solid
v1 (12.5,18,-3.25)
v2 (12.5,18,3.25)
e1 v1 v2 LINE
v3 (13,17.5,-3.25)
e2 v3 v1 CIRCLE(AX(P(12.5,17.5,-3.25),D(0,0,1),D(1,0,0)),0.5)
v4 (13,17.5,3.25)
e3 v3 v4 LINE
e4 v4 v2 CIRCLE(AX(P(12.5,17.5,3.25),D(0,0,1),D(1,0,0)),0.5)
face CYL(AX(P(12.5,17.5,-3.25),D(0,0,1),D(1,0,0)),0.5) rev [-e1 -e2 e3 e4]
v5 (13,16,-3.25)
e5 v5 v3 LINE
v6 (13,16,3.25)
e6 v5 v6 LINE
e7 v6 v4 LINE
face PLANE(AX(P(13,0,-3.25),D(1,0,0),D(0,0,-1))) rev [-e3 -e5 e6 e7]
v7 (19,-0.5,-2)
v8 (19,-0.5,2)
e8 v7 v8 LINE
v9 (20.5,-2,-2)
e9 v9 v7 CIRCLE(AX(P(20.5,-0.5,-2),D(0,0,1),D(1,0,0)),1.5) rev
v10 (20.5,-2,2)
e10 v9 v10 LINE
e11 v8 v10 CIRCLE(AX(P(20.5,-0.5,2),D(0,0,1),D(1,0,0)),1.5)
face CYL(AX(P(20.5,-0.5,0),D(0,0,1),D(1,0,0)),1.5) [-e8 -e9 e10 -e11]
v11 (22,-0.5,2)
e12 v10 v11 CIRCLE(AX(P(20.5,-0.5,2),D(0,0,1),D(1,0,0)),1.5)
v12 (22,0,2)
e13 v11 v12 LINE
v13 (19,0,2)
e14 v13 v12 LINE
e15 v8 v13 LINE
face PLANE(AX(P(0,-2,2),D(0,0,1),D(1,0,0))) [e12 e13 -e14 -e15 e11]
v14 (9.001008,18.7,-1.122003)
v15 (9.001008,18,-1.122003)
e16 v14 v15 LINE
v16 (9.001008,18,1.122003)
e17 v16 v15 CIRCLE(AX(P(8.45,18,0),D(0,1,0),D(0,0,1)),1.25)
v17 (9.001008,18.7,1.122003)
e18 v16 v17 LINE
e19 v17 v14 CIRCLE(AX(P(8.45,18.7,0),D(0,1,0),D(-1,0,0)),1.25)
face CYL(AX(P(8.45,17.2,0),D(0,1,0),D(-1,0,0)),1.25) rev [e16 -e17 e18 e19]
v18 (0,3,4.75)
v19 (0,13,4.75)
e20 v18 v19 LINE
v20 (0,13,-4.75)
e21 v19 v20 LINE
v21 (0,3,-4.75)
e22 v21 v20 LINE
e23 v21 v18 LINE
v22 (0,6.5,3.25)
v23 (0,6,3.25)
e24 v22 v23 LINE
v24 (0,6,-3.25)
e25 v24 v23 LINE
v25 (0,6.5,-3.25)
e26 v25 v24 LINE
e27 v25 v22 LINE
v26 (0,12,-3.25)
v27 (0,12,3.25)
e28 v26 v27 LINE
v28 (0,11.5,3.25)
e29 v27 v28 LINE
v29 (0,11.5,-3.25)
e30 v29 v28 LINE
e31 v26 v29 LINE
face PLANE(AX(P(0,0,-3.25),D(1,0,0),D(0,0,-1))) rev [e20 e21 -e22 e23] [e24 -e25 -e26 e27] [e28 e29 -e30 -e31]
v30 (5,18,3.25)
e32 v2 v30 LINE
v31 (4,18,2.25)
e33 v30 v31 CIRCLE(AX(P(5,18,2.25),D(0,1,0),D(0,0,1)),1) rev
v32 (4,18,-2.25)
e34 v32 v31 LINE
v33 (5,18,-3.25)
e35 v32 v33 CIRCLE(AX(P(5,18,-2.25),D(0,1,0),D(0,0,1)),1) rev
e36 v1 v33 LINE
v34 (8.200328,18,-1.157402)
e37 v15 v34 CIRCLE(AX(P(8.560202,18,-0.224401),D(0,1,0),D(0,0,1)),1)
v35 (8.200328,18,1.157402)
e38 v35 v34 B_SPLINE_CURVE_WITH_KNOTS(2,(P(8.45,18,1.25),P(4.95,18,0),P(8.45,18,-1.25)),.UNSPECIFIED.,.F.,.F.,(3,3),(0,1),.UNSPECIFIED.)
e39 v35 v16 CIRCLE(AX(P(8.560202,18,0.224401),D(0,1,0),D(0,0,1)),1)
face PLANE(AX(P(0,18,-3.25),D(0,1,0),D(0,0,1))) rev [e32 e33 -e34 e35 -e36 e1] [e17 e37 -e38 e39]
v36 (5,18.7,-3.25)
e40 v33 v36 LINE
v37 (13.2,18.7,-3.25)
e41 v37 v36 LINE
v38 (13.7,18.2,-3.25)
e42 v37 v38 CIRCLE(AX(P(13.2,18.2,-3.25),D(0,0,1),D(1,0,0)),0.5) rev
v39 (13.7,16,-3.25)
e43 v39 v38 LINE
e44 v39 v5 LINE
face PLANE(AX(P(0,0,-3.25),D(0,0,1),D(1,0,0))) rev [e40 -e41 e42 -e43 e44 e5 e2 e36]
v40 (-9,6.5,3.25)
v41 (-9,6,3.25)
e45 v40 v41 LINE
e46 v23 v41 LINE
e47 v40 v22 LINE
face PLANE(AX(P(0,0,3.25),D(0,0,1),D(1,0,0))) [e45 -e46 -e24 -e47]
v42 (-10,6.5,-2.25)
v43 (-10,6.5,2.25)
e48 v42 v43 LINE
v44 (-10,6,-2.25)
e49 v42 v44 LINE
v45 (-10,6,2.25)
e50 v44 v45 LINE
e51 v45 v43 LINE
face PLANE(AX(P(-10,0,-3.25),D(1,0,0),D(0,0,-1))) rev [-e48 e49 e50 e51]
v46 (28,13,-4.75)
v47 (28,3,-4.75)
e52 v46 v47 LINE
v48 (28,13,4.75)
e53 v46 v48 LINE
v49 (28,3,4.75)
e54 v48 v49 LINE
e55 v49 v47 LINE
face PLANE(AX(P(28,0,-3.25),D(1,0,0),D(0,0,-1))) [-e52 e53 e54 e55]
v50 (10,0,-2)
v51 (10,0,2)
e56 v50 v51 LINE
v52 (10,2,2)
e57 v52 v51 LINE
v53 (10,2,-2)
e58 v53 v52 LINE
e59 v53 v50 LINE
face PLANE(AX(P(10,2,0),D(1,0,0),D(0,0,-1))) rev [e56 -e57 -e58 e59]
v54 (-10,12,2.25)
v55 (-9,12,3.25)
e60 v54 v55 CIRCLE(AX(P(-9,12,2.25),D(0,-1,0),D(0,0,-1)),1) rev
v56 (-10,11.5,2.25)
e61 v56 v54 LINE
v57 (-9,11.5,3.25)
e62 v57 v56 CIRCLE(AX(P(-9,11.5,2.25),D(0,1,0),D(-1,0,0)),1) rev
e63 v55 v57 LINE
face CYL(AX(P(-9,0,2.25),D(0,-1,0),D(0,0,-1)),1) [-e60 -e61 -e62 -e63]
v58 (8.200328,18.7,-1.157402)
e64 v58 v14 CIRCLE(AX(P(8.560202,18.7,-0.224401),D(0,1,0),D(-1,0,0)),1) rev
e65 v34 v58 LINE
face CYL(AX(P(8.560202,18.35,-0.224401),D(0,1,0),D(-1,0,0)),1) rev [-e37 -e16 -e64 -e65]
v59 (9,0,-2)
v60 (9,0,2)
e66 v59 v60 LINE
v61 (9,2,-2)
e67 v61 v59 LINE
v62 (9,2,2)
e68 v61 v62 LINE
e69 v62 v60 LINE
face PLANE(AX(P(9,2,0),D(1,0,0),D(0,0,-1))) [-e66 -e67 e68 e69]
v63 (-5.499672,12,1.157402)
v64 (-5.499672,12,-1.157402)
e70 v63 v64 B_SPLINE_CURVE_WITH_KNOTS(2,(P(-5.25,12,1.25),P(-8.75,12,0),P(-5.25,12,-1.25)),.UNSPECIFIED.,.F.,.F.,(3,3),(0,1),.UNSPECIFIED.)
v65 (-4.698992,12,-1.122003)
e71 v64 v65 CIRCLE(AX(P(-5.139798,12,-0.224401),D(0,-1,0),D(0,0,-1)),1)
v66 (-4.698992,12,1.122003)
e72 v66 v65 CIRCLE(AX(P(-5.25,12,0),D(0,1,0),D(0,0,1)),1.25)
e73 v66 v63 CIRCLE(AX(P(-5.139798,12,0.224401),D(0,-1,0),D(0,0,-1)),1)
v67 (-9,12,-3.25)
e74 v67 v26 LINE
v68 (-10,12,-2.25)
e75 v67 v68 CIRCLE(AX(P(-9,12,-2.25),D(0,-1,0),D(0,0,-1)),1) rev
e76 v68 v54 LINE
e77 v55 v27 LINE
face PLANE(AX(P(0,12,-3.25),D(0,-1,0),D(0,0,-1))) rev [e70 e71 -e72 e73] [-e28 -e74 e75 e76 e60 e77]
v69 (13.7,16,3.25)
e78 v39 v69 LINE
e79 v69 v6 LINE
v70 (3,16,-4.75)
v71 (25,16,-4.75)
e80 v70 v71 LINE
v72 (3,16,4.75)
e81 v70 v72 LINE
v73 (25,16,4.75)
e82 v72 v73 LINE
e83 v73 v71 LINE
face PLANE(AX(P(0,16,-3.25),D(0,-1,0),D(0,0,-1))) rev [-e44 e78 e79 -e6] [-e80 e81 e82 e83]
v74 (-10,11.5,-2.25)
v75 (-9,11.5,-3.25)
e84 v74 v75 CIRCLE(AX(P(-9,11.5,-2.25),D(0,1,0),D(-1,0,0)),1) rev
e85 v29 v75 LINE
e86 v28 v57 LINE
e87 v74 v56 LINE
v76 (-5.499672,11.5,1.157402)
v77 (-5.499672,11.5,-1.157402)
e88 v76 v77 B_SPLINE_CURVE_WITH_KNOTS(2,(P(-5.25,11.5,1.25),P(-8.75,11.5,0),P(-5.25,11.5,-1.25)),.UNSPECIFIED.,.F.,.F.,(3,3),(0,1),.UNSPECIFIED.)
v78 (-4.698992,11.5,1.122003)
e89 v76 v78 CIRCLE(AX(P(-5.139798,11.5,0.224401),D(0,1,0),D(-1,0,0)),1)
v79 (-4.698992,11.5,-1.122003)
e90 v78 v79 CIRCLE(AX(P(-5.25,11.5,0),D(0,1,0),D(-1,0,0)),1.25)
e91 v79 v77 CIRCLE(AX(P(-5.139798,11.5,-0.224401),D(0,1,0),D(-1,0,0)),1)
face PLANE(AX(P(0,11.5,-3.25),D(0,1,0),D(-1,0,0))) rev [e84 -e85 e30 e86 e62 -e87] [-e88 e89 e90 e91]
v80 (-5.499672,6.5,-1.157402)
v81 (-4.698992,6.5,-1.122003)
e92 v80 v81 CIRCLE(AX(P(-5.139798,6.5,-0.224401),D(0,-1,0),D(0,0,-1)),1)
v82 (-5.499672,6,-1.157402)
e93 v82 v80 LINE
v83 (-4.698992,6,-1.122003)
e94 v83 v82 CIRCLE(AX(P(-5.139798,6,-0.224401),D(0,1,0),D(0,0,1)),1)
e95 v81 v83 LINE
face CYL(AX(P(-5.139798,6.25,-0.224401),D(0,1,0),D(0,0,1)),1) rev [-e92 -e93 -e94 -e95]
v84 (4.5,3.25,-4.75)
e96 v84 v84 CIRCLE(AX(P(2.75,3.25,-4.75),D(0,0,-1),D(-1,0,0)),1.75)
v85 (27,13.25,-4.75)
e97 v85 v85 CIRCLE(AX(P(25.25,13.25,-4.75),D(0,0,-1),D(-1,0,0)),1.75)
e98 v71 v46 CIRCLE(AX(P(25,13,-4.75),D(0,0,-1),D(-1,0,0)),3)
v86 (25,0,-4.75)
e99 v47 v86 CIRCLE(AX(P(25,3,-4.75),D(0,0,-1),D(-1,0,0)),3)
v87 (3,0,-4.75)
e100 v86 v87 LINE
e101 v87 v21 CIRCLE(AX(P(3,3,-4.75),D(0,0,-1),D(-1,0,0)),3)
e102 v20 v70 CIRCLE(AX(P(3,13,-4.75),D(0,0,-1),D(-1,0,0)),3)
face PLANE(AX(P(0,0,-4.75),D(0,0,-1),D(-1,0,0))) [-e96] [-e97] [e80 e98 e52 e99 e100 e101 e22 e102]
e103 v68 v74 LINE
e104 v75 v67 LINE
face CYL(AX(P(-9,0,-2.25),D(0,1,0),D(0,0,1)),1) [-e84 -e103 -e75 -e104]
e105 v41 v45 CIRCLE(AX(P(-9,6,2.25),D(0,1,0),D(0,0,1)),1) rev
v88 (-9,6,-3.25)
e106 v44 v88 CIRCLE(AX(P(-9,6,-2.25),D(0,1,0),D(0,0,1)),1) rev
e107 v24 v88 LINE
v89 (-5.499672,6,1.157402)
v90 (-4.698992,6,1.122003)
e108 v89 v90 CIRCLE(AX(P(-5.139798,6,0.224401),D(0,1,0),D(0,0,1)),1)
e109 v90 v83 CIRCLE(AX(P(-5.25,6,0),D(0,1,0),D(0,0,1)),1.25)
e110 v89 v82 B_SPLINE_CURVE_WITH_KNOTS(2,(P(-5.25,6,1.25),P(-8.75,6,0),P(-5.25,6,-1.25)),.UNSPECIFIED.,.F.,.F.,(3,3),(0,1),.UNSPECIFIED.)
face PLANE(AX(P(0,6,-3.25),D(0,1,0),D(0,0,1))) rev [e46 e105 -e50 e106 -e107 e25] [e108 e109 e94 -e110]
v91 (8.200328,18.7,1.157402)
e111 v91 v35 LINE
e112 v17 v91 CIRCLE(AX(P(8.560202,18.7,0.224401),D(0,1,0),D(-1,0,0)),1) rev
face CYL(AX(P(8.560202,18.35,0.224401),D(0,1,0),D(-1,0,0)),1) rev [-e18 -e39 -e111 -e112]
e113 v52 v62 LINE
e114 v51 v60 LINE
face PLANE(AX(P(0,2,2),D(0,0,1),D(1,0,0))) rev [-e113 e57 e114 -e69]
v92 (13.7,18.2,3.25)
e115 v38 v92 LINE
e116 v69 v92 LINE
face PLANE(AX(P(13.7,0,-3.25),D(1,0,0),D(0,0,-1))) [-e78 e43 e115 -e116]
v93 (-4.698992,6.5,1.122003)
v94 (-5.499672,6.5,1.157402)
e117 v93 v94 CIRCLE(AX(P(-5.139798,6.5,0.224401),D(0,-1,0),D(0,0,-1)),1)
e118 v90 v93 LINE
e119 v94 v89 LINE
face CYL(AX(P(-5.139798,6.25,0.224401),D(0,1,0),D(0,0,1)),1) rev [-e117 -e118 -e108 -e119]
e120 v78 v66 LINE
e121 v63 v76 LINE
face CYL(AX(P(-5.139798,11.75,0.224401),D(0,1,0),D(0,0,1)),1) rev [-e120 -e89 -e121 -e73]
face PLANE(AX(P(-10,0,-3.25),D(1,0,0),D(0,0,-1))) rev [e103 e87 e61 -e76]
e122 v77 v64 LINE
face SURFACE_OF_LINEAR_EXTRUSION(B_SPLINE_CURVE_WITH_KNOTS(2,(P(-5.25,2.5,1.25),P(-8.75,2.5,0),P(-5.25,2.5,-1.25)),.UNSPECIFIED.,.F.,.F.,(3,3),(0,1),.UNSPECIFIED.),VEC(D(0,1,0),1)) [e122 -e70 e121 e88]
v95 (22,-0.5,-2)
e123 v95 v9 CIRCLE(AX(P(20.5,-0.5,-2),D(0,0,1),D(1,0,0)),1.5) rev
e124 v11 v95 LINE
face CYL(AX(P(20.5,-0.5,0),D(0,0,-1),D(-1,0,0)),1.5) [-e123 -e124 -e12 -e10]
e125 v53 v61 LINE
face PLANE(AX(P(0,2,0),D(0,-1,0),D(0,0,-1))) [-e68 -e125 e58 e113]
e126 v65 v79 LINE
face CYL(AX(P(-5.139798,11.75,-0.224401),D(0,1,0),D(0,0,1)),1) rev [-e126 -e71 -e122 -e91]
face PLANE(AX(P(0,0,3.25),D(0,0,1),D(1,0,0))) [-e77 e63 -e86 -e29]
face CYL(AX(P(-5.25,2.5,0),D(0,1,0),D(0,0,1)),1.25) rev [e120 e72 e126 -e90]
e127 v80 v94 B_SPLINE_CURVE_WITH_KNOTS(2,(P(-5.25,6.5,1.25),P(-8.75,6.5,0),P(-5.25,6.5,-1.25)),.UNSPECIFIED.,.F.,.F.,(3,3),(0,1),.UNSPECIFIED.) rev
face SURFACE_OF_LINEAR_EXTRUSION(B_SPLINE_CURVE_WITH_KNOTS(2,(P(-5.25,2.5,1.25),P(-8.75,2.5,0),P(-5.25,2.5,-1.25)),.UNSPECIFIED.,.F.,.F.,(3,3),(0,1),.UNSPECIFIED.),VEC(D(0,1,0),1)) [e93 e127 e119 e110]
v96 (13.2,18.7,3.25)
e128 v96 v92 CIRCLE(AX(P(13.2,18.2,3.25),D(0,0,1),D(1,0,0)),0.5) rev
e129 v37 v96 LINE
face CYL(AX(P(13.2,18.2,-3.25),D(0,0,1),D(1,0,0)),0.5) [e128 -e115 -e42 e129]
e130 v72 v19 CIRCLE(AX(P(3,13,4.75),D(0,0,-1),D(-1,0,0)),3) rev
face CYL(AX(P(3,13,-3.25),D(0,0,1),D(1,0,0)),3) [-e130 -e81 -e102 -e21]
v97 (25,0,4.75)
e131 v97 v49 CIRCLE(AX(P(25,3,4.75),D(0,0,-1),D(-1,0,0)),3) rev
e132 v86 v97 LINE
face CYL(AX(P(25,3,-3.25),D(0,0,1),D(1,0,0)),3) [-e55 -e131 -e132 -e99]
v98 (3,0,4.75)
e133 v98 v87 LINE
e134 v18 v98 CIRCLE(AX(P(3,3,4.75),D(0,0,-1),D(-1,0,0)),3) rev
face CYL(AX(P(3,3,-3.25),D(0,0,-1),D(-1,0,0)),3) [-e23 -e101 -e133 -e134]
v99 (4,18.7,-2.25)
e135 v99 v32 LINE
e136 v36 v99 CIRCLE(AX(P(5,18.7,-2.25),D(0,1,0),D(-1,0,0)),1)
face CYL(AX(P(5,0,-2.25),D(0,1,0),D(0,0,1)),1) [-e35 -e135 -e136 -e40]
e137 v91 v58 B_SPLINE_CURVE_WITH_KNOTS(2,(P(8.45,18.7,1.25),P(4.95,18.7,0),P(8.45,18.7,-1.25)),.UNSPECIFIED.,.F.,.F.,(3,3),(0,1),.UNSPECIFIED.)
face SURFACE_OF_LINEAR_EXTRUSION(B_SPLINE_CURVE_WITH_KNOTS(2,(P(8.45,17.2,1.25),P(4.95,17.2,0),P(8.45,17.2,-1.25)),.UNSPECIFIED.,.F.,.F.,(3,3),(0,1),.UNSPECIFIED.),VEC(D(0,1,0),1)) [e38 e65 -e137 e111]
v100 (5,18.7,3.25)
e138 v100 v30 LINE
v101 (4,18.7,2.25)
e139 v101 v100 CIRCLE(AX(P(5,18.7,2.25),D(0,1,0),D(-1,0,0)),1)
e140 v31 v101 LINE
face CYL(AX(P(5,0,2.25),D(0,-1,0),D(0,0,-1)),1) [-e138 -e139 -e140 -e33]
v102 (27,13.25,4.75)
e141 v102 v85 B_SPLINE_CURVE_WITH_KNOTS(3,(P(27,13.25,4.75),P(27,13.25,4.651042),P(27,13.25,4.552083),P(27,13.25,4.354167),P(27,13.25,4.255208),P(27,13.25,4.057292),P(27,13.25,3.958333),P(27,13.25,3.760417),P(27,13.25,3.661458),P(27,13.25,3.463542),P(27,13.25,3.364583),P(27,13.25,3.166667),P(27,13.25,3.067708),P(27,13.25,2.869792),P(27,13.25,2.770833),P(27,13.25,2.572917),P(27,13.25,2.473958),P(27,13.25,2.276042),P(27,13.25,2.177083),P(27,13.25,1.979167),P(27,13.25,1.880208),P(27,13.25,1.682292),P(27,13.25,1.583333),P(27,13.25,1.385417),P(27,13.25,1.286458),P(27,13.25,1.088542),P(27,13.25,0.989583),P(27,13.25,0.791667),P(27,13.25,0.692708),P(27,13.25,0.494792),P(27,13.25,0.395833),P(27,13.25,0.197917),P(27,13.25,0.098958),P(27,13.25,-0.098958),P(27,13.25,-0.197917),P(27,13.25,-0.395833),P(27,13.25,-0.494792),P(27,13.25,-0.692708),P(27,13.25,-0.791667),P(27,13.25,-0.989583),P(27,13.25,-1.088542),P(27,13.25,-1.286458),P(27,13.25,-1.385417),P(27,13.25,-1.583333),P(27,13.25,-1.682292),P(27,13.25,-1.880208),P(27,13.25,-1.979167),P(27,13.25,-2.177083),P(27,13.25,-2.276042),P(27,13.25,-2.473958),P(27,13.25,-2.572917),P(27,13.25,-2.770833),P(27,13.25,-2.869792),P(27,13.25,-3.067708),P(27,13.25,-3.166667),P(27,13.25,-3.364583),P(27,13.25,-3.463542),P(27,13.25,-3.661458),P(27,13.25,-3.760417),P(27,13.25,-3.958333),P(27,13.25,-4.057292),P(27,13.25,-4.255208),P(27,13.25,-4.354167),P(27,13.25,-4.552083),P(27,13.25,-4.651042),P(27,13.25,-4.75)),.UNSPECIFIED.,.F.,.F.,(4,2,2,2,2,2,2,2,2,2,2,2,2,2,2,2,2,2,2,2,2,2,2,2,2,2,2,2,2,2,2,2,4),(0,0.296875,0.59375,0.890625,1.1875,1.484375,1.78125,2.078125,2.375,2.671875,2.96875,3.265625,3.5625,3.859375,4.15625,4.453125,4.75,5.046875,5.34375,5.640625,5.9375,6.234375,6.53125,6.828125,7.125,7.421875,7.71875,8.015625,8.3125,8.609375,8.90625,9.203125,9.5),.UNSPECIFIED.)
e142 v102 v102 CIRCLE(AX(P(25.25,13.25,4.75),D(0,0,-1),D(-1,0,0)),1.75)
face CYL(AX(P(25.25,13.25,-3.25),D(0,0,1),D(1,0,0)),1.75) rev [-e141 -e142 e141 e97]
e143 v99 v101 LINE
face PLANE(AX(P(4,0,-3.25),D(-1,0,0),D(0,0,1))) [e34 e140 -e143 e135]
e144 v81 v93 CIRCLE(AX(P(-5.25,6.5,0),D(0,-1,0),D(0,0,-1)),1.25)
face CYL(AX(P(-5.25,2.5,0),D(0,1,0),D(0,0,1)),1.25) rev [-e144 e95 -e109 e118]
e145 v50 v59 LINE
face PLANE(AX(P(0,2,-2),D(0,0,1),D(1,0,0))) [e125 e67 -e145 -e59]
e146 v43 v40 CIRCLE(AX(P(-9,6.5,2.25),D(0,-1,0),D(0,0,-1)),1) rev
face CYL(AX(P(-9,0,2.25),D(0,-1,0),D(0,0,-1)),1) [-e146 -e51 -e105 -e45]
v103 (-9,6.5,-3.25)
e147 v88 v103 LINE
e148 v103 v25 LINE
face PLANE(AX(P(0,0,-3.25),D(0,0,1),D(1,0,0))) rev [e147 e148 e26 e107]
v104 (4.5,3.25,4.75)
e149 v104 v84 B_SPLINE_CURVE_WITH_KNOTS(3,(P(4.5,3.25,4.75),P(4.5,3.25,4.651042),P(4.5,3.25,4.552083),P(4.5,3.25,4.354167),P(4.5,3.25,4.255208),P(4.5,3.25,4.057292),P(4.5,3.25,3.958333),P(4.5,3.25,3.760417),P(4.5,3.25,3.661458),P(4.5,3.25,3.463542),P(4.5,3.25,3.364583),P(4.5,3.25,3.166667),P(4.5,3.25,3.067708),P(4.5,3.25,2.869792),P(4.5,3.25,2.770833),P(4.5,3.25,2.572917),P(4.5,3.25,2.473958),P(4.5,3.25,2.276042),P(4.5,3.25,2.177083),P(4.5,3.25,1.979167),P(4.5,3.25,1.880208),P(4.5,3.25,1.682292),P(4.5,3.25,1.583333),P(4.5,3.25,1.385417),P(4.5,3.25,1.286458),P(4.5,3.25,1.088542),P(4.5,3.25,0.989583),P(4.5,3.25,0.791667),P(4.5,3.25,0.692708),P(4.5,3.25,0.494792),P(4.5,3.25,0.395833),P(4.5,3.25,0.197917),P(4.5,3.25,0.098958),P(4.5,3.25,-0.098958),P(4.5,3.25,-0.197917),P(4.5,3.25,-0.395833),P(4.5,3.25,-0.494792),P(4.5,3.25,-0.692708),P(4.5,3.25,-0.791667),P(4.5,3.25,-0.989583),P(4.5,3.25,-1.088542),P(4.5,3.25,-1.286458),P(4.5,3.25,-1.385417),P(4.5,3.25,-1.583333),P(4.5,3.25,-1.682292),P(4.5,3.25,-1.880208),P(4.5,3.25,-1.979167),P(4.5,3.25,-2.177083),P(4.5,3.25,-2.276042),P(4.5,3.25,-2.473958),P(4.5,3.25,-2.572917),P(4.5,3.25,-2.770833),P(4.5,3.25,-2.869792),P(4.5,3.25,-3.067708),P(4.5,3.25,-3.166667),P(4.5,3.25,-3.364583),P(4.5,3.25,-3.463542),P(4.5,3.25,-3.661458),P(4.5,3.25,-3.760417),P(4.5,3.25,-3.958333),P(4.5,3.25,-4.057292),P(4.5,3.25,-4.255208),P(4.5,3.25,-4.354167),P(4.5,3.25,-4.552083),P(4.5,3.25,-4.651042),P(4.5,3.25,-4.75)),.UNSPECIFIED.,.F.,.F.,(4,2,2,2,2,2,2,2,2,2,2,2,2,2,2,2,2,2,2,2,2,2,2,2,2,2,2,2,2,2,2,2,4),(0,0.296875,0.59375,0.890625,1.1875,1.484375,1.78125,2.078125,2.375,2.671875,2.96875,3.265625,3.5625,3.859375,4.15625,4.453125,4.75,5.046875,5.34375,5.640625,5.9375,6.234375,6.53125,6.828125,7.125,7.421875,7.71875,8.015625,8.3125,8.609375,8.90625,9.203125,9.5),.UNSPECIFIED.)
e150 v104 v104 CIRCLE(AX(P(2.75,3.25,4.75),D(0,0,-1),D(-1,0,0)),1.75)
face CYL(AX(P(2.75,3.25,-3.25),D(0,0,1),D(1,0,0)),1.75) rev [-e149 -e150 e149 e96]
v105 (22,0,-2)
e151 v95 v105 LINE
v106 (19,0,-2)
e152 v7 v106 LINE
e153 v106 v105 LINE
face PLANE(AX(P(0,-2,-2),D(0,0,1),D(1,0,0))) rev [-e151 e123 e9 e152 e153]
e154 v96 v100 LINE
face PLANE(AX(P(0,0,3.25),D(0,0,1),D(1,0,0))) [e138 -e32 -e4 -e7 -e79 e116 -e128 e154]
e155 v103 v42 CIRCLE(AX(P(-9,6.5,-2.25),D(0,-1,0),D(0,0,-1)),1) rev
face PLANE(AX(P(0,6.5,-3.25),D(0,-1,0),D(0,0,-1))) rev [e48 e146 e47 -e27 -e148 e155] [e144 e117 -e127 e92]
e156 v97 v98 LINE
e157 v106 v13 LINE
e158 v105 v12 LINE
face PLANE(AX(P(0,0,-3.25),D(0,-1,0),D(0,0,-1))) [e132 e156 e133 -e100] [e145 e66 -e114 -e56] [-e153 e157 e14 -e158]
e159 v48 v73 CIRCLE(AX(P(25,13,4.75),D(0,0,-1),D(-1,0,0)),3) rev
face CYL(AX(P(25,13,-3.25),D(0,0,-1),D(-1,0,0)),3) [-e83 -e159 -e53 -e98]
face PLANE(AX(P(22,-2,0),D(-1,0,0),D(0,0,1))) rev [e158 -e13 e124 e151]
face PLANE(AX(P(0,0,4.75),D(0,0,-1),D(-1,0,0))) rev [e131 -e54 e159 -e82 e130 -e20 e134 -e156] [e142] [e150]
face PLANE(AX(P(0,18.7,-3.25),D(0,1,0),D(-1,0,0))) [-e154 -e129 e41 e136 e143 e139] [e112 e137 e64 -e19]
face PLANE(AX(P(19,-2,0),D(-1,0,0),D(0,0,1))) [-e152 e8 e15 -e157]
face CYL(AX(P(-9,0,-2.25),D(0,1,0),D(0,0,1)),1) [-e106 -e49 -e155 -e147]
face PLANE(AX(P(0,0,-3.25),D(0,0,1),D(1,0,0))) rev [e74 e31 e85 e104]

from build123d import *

# Parameters (mm, degrees)
BOSS_EXTRUDE1_DEPTH      = 3.25
BOSS_EXTRUDE1_DEPTH_BACK = 3.25
SKETCH1_W                = 10
SKETCH1_H                = 0.5
SKETCH1_W_2              = 28
SKETCH1_H_2              = 16
SKETCH1_R                = 1.75
BOSS_EXTRUDE2_DEPTH      = 1.5
BOSS_EXTRUDE2_DEPTH_BACK = 8
SKETCH2_W                = 28
SKETCH2_H                = 16
SKETCH2_R                = 1.75
CUT_EXTRUDE1_DEPTH       = 9.5
CUT_EXTRUDE2_DEPTH       = 1.5
FILLET1_R                = 1
FILLET2_R                = 1
FILLET3_R                = 3
SKETCH5_W                = 3
SKETCH5_H                = 2
BOSS_EXTRUDE3_DEPTH      = 2
FILLET4_R                = 1.5
CUT_EXTRUDE3_DEPTH       = 35.003713088
CUT_EXTRUDE3_DEPTH_BACK  = 2
SKETCH6_W                = 1
SKETCH6_H                = 4


with BuildPart() as part:
    # Sketch1 → Boss-Extrude1 (new, two sides: drawn at the far end of the back side and taken through both)
    # profile 1 of 4: a face of its own
    with BuildSketch(Plane.XY.offset(-BOSS_EXTRUDE1_DEPTH_BACK)):
        with Locations((-5, 6.25)):
            Rectangle(SKETCH1_W, SKETCH1_H)
    # profile 2 of 4: a face of its own
    with BuildSketch(Plane.XY.offset(-BOSS_EXTRUDE1_DEPTH_BACK)):
        with Locations((-5, 11.75)):
            Rectangle(SKETCH1_W, SKETCH1_H)
    # profile 3 of 4: a face of its own
    with BuildSketch(Plane.XY.offset(-BOSS_EXTRUDE1_DEPTH_BACK)):
        with Locations((14, 8)):
            Rectangle(SKETCH1_W_2, SKETCH1_H_2)
        with Locations((2.75, 3.25)):
            Circle(SKETCH1_R, mode=Mode.SUBTRACT)
        with Locations((25.25, 13.25)):
            Circle(SKETCH1_R, mode=Mode.SUBTRACT)
    # profile 4 of 4: a face of its own
    with BuildSketch(Plane.XY.offset(-BOSS_EXTRUDE1_DEPTH_BACK)):
        with BuildLine():
            Line((13, 16), (13.7, 16))
            Line((13.7, 16), (13.7, 18.2))
            ThreePointArc((13.7, 18.2), (13.553553391, 18.553553391), (13.2, 18.7))
            Line((13.2, 18.7), (4, 18.7))
            Line((4, 18.7), (4, 18))
            Line((4, 18), (12.5, 18))
            ThreePointArc((12.5, 18), (12.853553391, 17.853553391), (13, 17.5))
            Line((13, 17.5), (13, 16))
        make_face()
    extrude(amount=BOSS_EXTRUDE1_DEPTH + BOSS_EXTRUDE1_DEPTH_BACK)

    # Sketch2 → Boss-Extrude2 (add, two sides: drawn at the far end of the back side and taken through both)
    with BuildSketch(Plane(origin=(0, 0, -3.25), x_dir=(-1, 0, 0), z_dir=(0, 0, -1)).offset(-BOSS_EXTRUDE2_DEPTH_BACK)):
        with Locations((-14, 8)):
            Rectangle(SKETCH2_W, SKETCH2_H)
        with Locations(Location((-25.25, 13.25, 0), (0, 0, 180))):
            Circle(SKETCH2_R, mode=Mode.SUBTRACT)
        with Locations(Location((-2.75, 3.25, 0), (0, 0, 180))):
            Circle(SKETCH2_R, mode=Mode.SUBTRACT)
    extrude(amount=BOSS_EXTRUDE2_DEPTH + BOSS_EXTRUDE2_DEPTH_BACK)

    # Sketch3 → Cut-Extrude1 (cut)
    with BuildSketch(Plane(origin=(0, 12, 0), x_dir=(1, 0, 0), z_dir=(0, 1, 0))):
        with BuildLine():
            ThreePointArc((-5.25, -1.25), (-4, 0), (-5.25, 1.25))
            add(Edge.make_bspline(
                [(-5.25, 1.25), (-8.75, 0), (-5.25, -1.25)],
                knots=[0.849927106, 0.849927106, 0.849927106, 1.849927106, 1.849927106, 1.849927106], degree=2))
        make_face()
    extrude(amount=-CUT_EXTRUDE1_DEPTH, mode=Mode.SUBTRACT)

    # Sketch4 → Cut-Extrude2 (cut)
    with BuildSketch(Plane(origin=(0, 18.7, 0), x_dir=(1, 0, 0), z_dir=(0, 1, 0))):
        with BuildLine():
            ThreePointArc((8.45, -1.25), (9.7, 0), (8.45, 1.25))
            add(Edge.make_bspline(
                [(8.45, 1.25), (4.95, 0), (8.45, -1.25)],
                knots=[0.849927106, 0.849927106, 0.849927106, 1.849927106, 1.849927106, 1.849927106], degree=2))
        make_face()
    extrude(amount=-CUT_EXTRUDE2_DEPTH, mode=Mode.SUBTRACT)

    # Fillet1
    fillet1_edges = [part.edges().sort_by_distance(p)[0] for p in [
        (-5.25, 6.25, 1.25),
        (-5.25, 6.25, -1.25),
        (-5.25, 11.75, 1.25),
        (-5.25, 11.75, -1.25),
        (8.45, 18.35, -1.25),
        (8.45, 18.35, 1.25),
    ]]
    fillet(fillet1_edges, radius=FILLET1_R)

    # Fillet2
    fillet2_edges = [part.edges().sort_by_distance(p)[0] for p in [
        (-10, 6.25, -3.25),
        (4, 18.35, -3.25),
        (-10, 6.25, 3.25),
        (-10, 11.75, 3.25),
        (4, 18.35, 3.25),
        (-10, 11.75, -3.25),
    ]]
    fillet(fillet2_edges, radius=FILLET2_R)

    # Fillet3
    fillet3_edges = [part.edges().sort_by_distance(p)[0] for p in [
        (0, 16, 0),
        (28, 16, 0),
        (28, 0, 0),
        (0, 0, 0),
    ]]
    fillet(fillet3_edges, radius=FILLET3_R)

    # Sketch5 → Boss-Extrude3 (add)
    with BuildSketch(Plane.XZ):
        with Locations((20.5, -1)):
            Rectangle(SKETCH5_W, SKETCH5_H)
        with Locations((20.5, 1)):
            Rectangle(SKETCH5_W, SKETCH5_H)
    extrude(amount=BOSS_EXTRUDE3_DEPTH)

    # Fillet4
    fillet4_edges = [part.edges().sort_by_distance(p)[0] for p in [
        (19, -2, 0),
        (22, -2, 0),
    ]]
    fillet(fillet4_edges, radius=FILLET4_R - 0.0001)  # a hair under: the kernel refuses the full size

    # Sketch6 → Cut-Extrude3 (cut, two sides: drawn at the far end of the back side and taken through both)
    with BuildSketch(Plane.XZ.offset(-CUT_EXTRUDE3_DEPTH_BACK)):
        with Locations((9.5, 0)):
            Rectangle(SKETCH6_W, SKETCH6_H)
    extrude(amount=CUT_EXTRUDE3_DEPTH + CUT_EXTRUDE3_DEPTH_BACK, mode=Mode.SUBTRACT)


solid = part.part
